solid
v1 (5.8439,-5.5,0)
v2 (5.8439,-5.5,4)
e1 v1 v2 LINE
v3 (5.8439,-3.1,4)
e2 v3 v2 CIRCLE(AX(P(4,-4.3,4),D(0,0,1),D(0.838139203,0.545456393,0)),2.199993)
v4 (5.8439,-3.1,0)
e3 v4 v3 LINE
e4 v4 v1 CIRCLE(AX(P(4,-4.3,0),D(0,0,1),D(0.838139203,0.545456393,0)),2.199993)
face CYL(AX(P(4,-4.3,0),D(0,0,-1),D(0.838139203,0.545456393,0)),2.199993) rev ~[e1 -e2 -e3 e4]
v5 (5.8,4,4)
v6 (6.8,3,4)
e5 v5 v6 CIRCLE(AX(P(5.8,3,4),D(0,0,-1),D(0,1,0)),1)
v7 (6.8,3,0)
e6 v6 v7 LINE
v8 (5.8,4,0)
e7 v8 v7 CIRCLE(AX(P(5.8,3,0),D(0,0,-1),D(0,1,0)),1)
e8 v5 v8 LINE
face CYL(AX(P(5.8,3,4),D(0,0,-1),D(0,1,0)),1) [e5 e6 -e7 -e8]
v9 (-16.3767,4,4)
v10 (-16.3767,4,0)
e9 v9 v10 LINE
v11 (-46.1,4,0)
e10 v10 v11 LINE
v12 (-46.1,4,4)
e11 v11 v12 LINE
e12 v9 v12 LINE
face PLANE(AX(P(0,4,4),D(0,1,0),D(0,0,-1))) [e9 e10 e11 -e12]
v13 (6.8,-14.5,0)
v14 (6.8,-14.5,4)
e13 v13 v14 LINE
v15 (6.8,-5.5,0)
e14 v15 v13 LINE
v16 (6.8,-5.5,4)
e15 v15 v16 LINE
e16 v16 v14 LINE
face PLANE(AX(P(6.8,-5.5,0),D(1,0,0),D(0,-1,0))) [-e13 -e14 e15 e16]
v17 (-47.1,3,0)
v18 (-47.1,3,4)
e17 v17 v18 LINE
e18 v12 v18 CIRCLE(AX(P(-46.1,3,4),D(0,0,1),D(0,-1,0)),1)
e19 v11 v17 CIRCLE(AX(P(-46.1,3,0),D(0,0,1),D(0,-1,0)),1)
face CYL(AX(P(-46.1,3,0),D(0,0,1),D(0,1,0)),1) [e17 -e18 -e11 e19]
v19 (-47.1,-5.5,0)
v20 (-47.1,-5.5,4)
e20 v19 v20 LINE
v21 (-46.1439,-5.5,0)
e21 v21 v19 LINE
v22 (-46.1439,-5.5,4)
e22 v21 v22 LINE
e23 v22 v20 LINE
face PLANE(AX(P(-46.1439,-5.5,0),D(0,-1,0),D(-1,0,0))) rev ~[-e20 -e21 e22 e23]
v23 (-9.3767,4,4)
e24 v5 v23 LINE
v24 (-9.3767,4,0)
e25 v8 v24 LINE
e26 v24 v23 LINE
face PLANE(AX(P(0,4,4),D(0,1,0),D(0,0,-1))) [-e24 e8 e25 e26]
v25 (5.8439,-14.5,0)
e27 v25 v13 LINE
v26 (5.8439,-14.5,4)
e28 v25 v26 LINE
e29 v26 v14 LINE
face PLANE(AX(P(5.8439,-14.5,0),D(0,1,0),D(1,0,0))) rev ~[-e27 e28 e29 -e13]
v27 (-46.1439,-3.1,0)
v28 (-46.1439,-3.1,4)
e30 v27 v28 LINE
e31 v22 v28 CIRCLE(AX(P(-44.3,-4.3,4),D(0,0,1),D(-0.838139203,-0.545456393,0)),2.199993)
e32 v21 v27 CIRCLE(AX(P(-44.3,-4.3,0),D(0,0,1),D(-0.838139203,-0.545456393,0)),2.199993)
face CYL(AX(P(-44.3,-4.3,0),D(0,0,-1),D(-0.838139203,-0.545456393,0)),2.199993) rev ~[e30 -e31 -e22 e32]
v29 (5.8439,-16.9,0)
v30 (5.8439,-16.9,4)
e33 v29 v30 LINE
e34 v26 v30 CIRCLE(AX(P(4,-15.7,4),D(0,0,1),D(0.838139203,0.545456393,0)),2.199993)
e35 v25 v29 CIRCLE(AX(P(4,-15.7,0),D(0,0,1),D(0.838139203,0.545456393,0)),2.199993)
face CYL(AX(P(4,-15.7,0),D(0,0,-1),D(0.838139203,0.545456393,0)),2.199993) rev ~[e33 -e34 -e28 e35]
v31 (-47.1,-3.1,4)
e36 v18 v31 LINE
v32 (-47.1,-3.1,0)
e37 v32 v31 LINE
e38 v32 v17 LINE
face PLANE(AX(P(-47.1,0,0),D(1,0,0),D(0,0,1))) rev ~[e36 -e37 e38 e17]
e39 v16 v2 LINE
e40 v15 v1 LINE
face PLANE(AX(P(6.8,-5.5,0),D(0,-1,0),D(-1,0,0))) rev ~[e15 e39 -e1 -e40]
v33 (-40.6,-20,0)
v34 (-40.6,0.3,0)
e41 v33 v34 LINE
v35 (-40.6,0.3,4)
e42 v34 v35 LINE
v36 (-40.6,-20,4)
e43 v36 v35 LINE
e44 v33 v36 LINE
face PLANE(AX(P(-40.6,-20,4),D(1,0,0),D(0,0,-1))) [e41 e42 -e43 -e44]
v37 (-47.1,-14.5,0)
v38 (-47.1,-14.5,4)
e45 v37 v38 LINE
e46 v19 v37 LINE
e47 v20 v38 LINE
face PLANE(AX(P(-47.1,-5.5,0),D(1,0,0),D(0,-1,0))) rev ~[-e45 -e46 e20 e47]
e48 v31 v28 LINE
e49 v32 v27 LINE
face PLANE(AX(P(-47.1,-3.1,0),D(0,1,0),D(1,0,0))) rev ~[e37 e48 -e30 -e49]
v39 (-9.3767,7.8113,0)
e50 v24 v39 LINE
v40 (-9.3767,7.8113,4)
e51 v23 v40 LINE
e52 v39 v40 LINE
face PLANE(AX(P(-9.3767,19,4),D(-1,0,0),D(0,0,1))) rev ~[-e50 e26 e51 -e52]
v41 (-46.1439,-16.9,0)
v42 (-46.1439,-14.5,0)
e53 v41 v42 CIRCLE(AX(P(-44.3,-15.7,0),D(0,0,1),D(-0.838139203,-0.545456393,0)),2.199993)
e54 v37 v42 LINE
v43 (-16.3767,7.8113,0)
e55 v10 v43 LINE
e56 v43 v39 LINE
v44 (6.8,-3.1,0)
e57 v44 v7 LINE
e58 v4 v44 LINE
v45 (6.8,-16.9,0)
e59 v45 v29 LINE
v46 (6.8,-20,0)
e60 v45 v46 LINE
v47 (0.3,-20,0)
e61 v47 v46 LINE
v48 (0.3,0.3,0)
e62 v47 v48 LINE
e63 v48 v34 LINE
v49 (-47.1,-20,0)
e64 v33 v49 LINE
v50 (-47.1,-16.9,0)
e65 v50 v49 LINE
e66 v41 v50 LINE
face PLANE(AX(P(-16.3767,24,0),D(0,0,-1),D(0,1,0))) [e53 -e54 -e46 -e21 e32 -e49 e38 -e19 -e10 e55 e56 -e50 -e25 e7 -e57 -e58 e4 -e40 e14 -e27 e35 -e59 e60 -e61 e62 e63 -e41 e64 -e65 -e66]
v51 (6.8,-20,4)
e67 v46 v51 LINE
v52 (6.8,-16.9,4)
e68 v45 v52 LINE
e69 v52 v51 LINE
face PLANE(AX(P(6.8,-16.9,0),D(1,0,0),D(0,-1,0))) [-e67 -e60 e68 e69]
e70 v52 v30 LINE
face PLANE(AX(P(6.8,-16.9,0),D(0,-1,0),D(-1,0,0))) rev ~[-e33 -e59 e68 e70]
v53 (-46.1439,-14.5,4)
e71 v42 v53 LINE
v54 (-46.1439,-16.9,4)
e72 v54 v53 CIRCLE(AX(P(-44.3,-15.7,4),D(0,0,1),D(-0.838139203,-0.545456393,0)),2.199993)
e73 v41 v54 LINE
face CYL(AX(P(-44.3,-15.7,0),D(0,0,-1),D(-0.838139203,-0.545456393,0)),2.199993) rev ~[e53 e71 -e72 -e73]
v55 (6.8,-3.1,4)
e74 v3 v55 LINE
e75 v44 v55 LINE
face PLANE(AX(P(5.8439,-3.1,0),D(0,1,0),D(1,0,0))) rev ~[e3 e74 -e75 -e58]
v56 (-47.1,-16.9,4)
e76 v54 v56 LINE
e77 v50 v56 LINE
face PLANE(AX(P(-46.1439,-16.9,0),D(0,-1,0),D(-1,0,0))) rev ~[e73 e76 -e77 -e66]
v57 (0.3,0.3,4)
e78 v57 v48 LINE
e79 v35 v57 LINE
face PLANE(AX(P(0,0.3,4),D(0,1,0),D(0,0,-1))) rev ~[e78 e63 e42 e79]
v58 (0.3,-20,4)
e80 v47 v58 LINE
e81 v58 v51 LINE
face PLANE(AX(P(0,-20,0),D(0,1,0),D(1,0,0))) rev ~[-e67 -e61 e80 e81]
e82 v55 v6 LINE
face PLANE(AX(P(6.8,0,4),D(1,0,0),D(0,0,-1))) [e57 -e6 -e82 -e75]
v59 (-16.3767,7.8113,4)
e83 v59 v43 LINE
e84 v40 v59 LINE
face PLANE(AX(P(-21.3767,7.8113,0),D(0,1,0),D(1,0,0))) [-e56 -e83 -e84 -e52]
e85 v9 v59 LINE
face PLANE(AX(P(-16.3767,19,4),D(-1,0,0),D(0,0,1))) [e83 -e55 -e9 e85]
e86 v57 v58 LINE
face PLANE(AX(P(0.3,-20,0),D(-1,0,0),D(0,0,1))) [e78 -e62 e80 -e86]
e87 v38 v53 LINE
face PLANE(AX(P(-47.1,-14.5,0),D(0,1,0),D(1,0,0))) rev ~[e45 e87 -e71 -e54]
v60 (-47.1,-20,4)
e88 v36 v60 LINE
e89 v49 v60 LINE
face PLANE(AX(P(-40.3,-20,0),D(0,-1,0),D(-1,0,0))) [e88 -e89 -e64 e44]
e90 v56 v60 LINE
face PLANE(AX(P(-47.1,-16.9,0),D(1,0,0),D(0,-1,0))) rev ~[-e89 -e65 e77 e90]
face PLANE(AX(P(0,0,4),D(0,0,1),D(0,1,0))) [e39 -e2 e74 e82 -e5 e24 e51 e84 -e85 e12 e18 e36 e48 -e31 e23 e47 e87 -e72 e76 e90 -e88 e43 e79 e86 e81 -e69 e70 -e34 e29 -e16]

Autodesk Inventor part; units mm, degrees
ref_plane "YZ Plane" through (0, 0, 0) normal (1, 0, 0) x (0, 1, 0)
sketch "Sketch1" plane through (0, 0, 0) normal (0, 0, 1) x (1, 0, 0)
  line L0 (5.8439, -14.5) -> (6.8, -14.5) projected
  line L1 (6.8, -5.5) -> (6.8, -14.5) projected
  line L2 (6.8, -5.5) -> (5.8439, -5.5) projected
  arc A0 (5.8439, -3.1) -> (5.8439, -5.5) centre (4, -4.3) ccw projected
  line L3 (5.8439, -3.1) -> (6.8, -3.1) projected
  line L4 (6.8, 0) -> (6.8, -3.1) projected
  line L5 (0, 0) -> (6.8, 0) projected
  line L6 (0, -20) -> (0, 0) projected
  line L7 (0, -20) -> (6.8, -20) projected
  line L8 (6.8, -16.9) -> (6.8, -20) projected
  line L9 (6.8, -16.9) -> (5.8439, -16.9) projected
  arc A1 (5.8439, -14.5) -> (5.8439, -16.9) centre (4, -15.7) ccw projected
  line L10 (-47.1, -14.5) -> (-46.1439, -14.5) projected
  arc A2 (-46.1439, -16.9) -> (-46.1439, -14.5) centre (-44.3, -15.7) ccw projected
  line L11 (-46.1439, -16.9) -> (-47.1, -16.9) projected
  line L12 (-47.1, -16.9) -> (-47.1, -20) projected
  line L13 (-40.3, -20) -> (-47.1, -20) projected
  line L14 (-40.3, 0) -> (-40.3, -20) projected
  line L15 (-40.3, 0) -> (-47.1, 0) projected
  line L16 (-47.1, 0) -> (-47.1, -3.1) projected
  line L17 (-47.1, -3.1) -> (-46.1439, -3.1) projected
  arc A3 (-46.1439, -5.5) -> (-46.1439, -3.1) centre (-44.3, -4.3) ccw projected
  line L18 (-46.1439, -5.5) -> (-47.1, -5.5) projected
  line L19 (-47.1, -5.5) -> (-47.1, -14.5) projected
extrude "Extrusion1" add sketch "Sketch1" along normal blind 4
sketch "Sketch2" plane through (0, 0, 0) normal (0, 1, 0) x (1, 0, 0)
  line L0 (0, 0) -> (6.8, 0) projected
  line L1 (0, 0) -> (0, -4) projected
  line L2 (6.8, -4) -> (0, -4) projected
  line L3 (6.8, 0) -> (6.8, -4) projected
  line L4 (-47.1, 0) -> (-47.1, -4) projected
  line L5 (-40.3, -4) -> (-47.1, -4) projected
  line L6 (6.8, 0) -> (-47.1, 0)
  line L7 (-47.1, 0) -> (-47.1, -4)
  line L8 (-47.1, -4) -> (6.8, -4)
  line L9 (6.8, -4) -> (6.8, 0)
extrude "Extrusion2" add sketch "Sketch2" along normal blind 4 contours L1 L8 L5 L4 L6
sketch "Sketch3" plane through (0, 0, 4) normal (1, 0, 0) x (0, 0, -1)
  line L0 (4, 0) -> (0, 0) projected
  line L1 (4, 4) -> (4, 0) projected
  line L2 (0, 4) -> (4, 4) projected
  line L3 (0, 0) -> (0, 4) projected
extrude "Extrusion3" add sketch "Sketch3" along normal up to surface (6.8 mm away)
sketch "Sketch4" plane through (0, 4, 0) normal (0, 1, 0) x (1, 0, 0)
  line L0 (6.8, 0) -> (-47.1, 0) projected
  line L1 (-47.1, -4) -> (6.8, -4) projected
  line L2 (-9.3767, -8.1) -> (-9.3767, -13.1) construction
  line L3 (-21.8189, -8.1) -> (-9.3767, -8.1) construction
  arc A0 (-17.3767, -8.1) -> (-40.8, 16.4941) centre (-48.3, -14.1) ccw construction
  line L4 (-9.3767, -4) -> (-16.3767, -4) construction
  line L5 (-16.3767, -4) -> (-16.3767, -8.1) construction
  line L6 (-16.3767, -8.1) -> (-9.3767, -8.1) construction
  line L7 (-9.3767, -8.1) -> (-9.3767, -4) construction
  line L8 (-9.3767, -4) -> (-16.3767, -4)
  line L9 (-16.3767, -4) -> (-16.3767, 0)
  line L10 (-16.3767, 0) -> (-9.3767, 0)
  line L11 (-9.3767, 0) -> (-9.3767, -4)
  point P0 (0, 0)
  dimension "d6" = 7
ref_plane "Work Plane1" through (-21.8189, 29, 8.1) normal (0, 1, 0) x (0, 0, 1)
extrude "Extrusion4" add sketch "Sketch4" along normal up to surface (25 mm away)
sketch "Sketch5" plane through (0, 0, 4) normal (0, 0, 1) x (1, 0, 0)
  circle A0 centre (-13.3767, 24) radius 2 construction
  line L0 (-21.8189, 24) -> (-17.3767, 24) construction
  line L1 (-21.8189, 24) -> (-21.8189, 29) construction
  line L2 (-21.8189, 29) -> (-9.3767, 29) construction
  line L3 (-9.3767, 19) -> (-9.3767, 29) construction
  line L4 (-17.3767, 19) -> (-9.3767, 19) construction
  line L5 (-17.3767, 24) -> (-17.3767, 19) construction
  line L6 (-9.3767, 19) -> (-16.3767, 19) construction
  line L7 (-16.3767, 19) -> (-16.3767, 29) construction
  line L8 (-16.3767, 29) -> (-9.3767, 29) construction
  line L9 (-9.3767, 29) -> (-9.3767, 19) construction
  line L10 (-9.3767, 19) -> (-16.3767, 19)
  line L11 (-16.3767, 19) -> (-16.3767, 29)
  line L12 (-16.3767, 29) -> (-9.3767, 29)
  line L13 (-9.3767, 29) -> (-9.3767, 19)
  circle A1 centre (-13.3767, 24) radius 2
ref_plane "Work Plane2" through (-21.8189, 19, 8.1) normal (0, 0, -1) x (0, 1, 0)
extrude "Extrusion5" add sketch "Sketch5" along normal up to surface (4.1 mm away)
sketch "Sketch6" plane through (-16.3767, 19, 8.1) normal (-1, 0, 0) x (0, 0, 1)
  line L0 (0, 5) -> (-24.5941, 5) construction
  line L1 (0, 0) -> (-24.5941, 0) construction
  line L2 (-8.1, 10) -> (0.5132, 10) construction
  line L3 (0.5132, 10) -> (0.5132, 5) construction
  line L4 (0.5132, 5) -> (-8.1, 5) construction
  line L5 (-8.1, 5) -> (-8.1, 10) construction
  line L6 (-8.1, 10) -> (0, 10)
  line L7 (0, 10) -> (0, 5)
  line L8 (0, 5) -> (-8.1, 5)
  line L9 (-8.1, 5) -> (-8.1, 10)
  point P0 (-8.1, -19)
extrude "Extrusion6" add sketch "Sketch6" along normal blind 5
sketch "Sketch7" plane through (-16.3767, 24, 0) normal (0, -1, 0) x (1, 0, 0)
  line L0 (0, 8.1) -> (0, 0) projected
  line L1 (0, 8.1) -> (-5, 8.1) projected
  line L2 (-5, 0) -> (-5, 8.1) projected
  line L3 (0, 0) -> (-5, 0) projected
  point P0 (16.3767, 0)
extrude "Extrusion7" cut sketch "Sketch7" against normal blind 0.4
sketch "Sketch8" plane through (0, 0, 0) normal (0, 0, -1) x (-1, 0, 0)
  circle A0 centre (13.3767, 24) radius 2 construction
  circle A1 centre (13.3767, 24) radius 2 projected
extrude "Extrusion8" cut sketch "Sketch8" against normal blind 4
fillet "Fillet3" radius 1 1 edges at (-16.3767, 24.4, 4.05)
sketch "Sketch9" plane through (-9.3767, 19, 8.1) normal (1, 0, 0) x (0, 0, -1)
  line L0 (0, 0) -> (0, 10) projected
  line L1 (8.1, 7) -> (0, 7) construction
  line L2 (8.1, 3) -> (0, 3) construction
  line L3 (24.5941, 5) -> (0, 5) construction
  line L4 (-5, 5) -> (0, 5) construction
  line L5 (4, 8.75) -> (7.5, 8.75)
  line L6 (7.5, 8.75) -> (7.5, 1.25)
  line L7 (7.5, 1.25) -> (4, 1.25)
  line L8 (4, 1.25) -> (4, 8.75)
  point P0 (8.1, -19)
  point P1 (4, 5)
  dimension "d20" = 3.5
  dimension "d21" = 7.5
  dimension "d22" = 4
extrude "Extrusion9" cut sketch "Sketch9" against normal blind 7.5
sketch "Sketch10" plane through (-16.3767, 19, 4) normal (0, -1, 0) x (1, 0, 0)
  line L0 (0, 4.1) -> (7, 4.1) projected
  line L1 (0, 0) -> (0, 4.1) projected
  line L2 (7, 0) -> (0, 0) projected
  line L3 (7, 0) -> (7, 4.1) projected
  point P0 (16.3767, -4)
extrude "Extrusion10" add sketch "Sketch10" along normal blind 3
fillet "Fillet4" radius 3 1 edges at (-12.8767, 16, 4)
sketch "Sketch11" plane through (0, 0, 0) normal (0, -1, 0) x (1, 0, 0)
  line L0 (-40.3, 0) -> (-40.3, 4) projected
  line L1 (0, 0) -> (-40.3, 0) projected
  line L2 (0, 0) -> (0, 4) projected
  line L3 (-40.3, 4) -> (0, 4) projected
extrude "Extrusion11" cut sketch "Sketch11" against normal blind 0.3
sketch "Sketch12" plane through (0, -20, 0) normal (-1, 0, 0) x (0, 0, 1)
  line L0 (0, 0) -> (0, 20.3) projected
  line L1 (0, 0) -> (4, 0) projected
  line L2 (4, 20.3) -> (4, 0) projected
  line L3 (4, 20.3) -> (0, 20.3) projected
  point P0 (0, 20)
extrude "Extrusion12" cut sketch "Sketch12" against normal blind 0.3
sketch "Sketch13" plane through (-40.3, -20, 4) normal (1, 0, 0) x (0, 0, -1)
  line L0 (4, 0) -> (4, 20.3) projected
  line L1 (4, 20.3) -> (0, 20.3) projected
  line L2 (0, 0) -> (0, 20.3) projected
  line L3 (4, 0) -> (0, 0) projected
  point P0 (4, 20)
extrude "Extrusion13" cut sketch "Sketch13" against normal blind 0.3
fillet "Fillet5" radius 1 2 edges at (6.8, 4, 2) (-47.1, 4, 2)
sketch "Sketch15" plane through (0, 0, 0) normal (0, 0, -1) x (-1, 0, 0)
  circle A0 centre (13.3767, 24) radius 2 projected
  line L0 (9.3767, 29) -> (21.3767, 29)
  line L1 (21.3767, 29) -> (21.3767, 7.8113)
  line L2 (21.3767, 7.8113) -> (9.3767, 7.8113)
  line L3 (9.3767, 7.8113) -> (9.3767, 29)
  point P0 (0, 0)
extrude "Extrusion14" cut sketch "Sketch15" against normal through all
properties part number "MG996RBracketTop"
